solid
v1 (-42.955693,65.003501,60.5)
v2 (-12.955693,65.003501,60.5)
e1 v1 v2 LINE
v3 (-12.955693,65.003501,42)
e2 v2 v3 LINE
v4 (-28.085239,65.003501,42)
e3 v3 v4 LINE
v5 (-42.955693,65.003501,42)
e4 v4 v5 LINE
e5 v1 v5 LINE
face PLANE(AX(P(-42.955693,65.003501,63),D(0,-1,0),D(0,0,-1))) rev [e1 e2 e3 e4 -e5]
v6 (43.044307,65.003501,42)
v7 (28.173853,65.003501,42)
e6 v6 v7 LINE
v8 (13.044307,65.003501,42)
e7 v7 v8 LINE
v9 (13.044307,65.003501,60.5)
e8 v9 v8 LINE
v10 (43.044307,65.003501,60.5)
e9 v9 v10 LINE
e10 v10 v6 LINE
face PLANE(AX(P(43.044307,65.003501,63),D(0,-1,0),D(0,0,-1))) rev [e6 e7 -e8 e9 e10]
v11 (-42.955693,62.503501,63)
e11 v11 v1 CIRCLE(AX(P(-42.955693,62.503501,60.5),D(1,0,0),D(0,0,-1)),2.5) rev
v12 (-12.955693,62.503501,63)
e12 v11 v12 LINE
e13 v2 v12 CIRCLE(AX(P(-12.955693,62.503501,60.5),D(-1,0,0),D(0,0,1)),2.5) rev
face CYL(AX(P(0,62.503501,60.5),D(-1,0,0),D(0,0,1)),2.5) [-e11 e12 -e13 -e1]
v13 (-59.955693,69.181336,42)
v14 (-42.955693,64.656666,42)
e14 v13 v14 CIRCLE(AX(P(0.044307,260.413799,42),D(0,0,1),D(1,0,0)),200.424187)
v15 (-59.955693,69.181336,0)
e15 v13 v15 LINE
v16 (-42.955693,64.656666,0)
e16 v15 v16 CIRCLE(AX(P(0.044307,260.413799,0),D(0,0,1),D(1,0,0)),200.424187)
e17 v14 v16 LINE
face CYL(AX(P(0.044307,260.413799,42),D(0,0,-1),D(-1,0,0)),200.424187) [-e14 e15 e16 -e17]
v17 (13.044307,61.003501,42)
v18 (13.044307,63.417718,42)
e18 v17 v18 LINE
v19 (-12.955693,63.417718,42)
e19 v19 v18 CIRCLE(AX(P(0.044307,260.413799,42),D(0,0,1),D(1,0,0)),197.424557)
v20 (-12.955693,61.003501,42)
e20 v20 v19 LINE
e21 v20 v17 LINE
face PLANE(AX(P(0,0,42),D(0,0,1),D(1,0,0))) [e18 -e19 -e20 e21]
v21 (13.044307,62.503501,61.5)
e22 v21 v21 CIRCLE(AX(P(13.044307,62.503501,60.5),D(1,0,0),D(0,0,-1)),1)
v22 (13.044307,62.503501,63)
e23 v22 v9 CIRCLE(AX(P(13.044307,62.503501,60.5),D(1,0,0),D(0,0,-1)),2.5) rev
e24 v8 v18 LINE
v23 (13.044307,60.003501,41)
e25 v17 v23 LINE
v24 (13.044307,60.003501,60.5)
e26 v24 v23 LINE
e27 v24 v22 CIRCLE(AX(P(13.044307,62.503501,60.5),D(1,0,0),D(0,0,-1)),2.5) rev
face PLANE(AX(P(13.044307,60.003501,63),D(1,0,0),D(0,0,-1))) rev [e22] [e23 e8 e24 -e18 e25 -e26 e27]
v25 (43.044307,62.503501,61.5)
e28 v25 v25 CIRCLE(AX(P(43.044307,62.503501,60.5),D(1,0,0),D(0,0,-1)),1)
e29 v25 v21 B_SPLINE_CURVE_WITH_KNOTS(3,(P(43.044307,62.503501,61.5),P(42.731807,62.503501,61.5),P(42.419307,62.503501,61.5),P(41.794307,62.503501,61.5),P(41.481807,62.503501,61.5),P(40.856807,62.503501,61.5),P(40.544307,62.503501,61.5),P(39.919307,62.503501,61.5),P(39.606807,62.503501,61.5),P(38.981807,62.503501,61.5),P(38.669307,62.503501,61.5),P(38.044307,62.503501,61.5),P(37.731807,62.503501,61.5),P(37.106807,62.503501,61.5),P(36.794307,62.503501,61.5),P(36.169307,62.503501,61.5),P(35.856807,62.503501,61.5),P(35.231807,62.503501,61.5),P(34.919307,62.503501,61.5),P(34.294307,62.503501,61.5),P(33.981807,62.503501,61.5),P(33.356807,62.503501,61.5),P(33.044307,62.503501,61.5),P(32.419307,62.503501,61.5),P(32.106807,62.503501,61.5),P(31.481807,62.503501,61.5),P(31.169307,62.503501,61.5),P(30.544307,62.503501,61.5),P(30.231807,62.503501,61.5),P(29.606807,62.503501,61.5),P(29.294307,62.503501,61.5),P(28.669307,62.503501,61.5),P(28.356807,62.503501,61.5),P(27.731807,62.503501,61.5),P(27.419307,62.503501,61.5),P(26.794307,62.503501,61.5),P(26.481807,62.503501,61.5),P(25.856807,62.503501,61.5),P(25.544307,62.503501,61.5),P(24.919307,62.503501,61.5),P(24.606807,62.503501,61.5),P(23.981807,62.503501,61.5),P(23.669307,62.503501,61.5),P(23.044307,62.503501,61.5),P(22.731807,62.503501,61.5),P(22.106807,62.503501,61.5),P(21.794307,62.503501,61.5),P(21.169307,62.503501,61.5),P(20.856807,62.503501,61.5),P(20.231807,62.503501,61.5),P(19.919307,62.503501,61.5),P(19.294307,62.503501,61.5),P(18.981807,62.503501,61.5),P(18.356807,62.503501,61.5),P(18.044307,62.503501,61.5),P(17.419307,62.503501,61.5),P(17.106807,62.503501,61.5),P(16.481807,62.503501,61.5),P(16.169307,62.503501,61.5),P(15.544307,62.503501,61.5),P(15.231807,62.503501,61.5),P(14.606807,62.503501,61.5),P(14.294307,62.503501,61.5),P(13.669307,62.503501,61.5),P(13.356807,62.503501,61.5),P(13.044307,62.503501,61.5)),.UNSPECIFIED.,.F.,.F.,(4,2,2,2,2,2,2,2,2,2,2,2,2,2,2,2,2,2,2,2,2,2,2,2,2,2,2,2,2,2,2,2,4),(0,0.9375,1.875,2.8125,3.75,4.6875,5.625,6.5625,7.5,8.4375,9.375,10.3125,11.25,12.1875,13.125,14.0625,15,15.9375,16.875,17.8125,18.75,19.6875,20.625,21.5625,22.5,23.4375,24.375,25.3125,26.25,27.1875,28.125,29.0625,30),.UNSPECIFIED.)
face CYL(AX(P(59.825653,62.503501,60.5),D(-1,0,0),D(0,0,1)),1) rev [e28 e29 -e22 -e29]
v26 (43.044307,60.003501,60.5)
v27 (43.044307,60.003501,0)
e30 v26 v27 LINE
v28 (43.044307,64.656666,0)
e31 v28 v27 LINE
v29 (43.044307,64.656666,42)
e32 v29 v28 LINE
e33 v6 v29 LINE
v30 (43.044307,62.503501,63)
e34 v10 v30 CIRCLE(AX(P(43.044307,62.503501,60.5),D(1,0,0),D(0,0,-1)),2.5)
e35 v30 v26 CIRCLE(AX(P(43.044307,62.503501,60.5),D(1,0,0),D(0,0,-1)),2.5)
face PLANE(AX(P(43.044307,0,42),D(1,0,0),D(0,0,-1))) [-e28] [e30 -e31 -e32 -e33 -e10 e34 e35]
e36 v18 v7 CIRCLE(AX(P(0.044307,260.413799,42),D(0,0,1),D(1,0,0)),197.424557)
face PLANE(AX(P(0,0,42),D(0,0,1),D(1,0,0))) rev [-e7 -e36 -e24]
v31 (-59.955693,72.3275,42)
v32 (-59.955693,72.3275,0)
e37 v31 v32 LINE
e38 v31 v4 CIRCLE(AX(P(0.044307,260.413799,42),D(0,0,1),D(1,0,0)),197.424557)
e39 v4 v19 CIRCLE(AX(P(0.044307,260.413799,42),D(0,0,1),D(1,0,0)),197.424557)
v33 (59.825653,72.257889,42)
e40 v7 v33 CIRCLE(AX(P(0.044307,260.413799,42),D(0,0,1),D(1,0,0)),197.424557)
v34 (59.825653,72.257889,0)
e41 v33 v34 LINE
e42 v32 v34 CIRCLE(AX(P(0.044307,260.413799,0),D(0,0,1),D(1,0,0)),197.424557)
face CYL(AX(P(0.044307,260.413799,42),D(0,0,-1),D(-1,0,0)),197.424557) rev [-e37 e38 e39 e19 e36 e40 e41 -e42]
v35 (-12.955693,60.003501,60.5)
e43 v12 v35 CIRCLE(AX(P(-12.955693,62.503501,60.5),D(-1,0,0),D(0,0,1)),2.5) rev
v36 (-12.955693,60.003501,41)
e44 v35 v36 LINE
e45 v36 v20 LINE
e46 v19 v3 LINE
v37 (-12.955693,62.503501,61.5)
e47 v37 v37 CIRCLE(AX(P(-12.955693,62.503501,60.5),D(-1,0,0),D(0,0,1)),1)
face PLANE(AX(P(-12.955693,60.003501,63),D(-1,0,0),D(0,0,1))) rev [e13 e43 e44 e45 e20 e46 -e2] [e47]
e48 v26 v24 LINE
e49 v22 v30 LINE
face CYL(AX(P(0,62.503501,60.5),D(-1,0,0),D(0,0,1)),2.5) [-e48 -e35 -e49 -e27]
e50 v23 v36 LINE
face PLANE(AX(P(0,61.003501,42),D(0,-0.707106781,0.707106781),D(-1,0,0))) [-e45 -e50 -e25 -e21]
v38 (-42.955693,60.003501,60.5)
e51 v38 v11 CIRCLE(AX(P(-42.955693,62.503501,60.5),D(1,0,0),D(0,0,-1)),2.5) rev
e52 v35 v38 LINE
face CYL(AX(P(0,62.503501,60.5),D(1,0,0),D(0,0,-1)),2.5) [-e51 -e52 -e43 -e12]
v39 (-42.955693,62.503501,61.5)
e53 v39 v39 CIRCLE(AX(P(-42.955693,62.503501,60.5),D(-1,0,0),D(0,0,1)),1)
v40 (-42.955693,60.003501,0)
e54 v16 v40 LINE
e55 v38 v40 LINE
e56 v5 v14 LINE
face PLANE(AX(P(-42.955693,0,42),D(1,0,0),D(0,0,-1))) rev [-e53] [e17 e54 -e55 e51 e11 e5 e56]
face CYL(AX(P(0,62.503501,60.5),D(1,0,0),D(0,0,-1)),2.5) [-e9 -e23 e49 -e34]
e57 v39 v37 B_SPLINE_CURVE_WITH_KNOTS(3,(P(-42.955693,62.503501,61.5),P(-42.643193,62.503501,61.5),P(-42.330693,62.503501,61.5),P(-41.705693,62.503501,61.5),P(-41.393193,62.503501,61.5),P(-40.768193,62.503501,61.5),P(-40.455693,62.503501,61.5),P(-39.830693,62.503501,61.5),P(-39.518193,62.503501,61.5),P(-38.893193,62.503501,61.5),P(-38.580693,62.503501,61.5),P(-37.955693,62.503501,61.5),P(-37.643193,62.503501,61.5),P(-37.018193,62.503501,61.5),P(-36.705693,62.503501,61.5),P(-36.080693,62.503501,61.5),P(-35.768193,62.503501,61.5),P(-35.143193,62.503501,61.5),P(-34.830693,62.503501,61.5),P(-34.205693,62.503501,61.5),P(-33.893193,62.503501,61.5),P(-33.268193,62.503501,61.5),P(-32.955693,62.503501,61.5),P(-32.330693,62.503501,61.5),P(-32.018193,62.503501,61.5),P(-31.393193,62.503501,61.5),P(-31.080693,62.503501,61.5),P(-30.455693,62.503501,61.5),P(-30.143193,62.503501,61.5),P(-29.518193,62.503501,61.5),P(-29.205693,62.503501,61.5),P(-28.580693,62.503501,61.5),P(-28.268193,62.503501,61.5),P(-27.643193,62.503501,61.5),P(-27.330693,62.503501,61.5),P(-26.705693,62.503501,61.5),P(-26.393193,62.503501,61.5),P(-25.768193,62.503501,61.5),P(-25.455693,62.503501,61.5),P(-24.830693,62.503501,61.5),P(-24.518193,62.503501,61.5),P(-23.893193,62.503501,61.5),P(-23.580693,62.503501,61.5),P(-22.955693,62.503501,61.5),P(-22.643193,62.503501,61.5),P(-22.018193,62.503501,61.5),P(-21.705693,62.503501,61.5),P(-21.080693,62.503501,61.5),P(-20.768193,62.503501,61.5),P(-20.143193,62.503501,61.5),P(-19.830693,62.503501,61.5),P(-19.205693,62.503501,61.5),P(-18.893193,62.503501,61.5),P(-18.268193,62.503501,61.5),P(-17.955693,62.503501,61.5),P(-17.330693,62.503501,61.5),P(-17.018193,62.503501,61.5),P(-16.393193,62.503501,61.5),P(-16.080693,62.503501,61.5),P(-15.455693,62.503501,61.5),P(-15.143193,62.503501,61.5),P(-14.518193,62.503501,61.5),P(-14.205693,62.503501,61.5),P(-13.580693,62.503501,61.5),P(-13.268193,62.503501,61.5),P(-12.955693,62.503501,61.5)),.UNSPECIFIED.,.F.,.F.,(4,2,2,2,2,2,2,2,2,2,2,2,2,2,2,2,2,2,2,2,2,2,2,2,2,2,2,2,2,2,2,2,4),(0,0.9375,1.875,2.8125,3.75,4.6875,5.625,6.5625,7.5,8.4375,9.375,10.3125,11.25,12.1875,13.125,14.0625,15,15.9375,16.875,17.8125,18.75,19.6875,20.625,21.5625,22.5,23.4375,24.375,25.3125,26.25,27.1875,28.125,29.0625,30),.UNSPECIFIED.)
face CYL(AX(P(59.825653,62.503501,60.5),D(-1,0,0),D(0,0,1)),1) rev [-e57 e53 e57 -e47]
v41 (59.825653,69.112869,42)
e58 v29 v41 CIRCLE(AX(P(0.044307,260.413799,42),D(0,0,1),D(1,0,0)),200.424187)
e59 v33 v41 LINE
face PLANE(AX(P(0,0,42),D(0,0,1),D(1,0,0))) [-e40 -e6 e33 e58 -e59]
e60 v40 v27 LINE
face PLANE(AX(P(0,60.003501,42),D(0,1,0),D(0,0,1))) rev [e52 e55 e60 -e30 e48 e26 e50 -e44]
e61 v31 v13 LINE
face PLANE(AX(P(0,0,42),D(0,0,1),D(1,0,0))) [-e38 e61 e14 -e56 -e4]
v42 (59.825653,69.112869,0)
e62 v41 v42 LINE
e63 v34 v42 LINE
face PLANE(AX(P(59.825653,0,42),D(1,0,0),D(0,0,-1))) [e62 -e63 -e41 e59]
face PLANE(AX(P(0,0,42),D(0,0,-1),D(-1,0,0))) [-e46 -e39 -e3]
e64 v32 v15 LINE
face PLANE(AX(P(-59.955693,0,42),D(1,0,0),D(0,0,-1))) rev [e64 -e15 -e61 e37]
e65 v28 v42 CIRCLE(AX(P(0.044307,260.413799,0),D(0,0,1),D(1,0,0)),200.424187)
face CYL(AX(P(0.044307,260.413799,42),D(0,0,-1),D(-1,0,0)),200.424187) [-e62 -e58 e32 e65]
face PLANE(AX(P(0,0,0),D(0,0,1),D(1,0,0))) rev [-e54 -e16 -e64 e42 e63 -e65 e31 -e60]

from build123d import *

# Parameters (mm, degrees)
RESSALTO_EXTRUS_O1_DEPTH = 42
SKETCH5_W                = 30
SKETCH5_H                = 5
BOSS_EXTRUDE3_DEPTH      = 21
FILLET1_R                = 2.5
CHAMFER1_SIZE            = 1
ESBO_O2_R                = 1
CORTE_EXTRUS_O1_DEPTH    = 141.585462716


with BuildPart() as part:
    # Esboço1 → Ressalto-extrusão1 (new body)
    with BuildSketch(Plane.XY):
        with BuildLine():
            ThreePointArc((59.825652908, 72.25788881), (-0.070426749, 62.989274947), (-59.955692994, 72.327500038))
            Line((-59.955692994, 72.327500038), (-59.955692994, 69.181335803))
            ThreePointArc((-59.955692994, 69.181335803), (-51.505359903, 66.732393535), (-42.955692994, 64.656666352))
            Line((-42.955692994, 64.656666352), (-42.955692994, 60.00350113))
            Line((-42.955692994, 60.00350113), (43.044307006, 60.00350113))
            Line((43.044307006, 60.00350113), (43.044307006, 64.656666352))
            ThreePointArc((43.044307006, 64.656666352), (51.483258227, 66.702959658), (59.825652908, 69.112869408))
            Line((59.825652908, 69.112869408), (59.825652908, 72.25788881))
        make_face()
    extrude(amount=RESSALTO_EXTRUS_O1_DEPTH)

    # Sketch5 → Boss-Extrude3 (add)
    with BuildSketch(Plane.XY.offset(42)):
        with Locations((-27.955692994, 62.50350113)):
            Rectangle(SKETCH5_W, SKETCH5_H)
        with Locations((28.044307006, 62.50350113)):
            Rectangle(SKETCH5_W, SKETCH5_H)
    extrude(amount=BOSS_EXTRUDE3_DEPTH)

    # Fillet1
    fillet1_edges = [part.edges().sort_by_distance(p)[0] for p in [
        (-27.955692994, 65.00350113, 63),
        (-27.955692994, 60.00350113, 63),
        (28.044307006, 65.00350113, 63),
        (28.044307006, 60.00350113, 63),
    ]]
    fillet(fillet1_edges, radius=FILLET1_R - 0.0001)  # a hair under: the kernel refuses the full size

    # Chamfer1
    chamfer1_edges = [part.edges().sort_by_distance(p)[0] for p in [
        (0.044307006, 60.00350113, 42),
    ]]
    chamfer(chamfer1_edges, length=CHAMFER1_SIZE)

    # Esboço2 → Corte-extrusão1 (cut, through all)
    with BuildSketch(Plane.ZY.offset(42.955692994)):
        with Locations((60.5, 62.50350113)):
            Circle(ESBO_O2_R)
    extrude(amount=-CORTE_EXTRUS_O1_DEPTH, mode=Mode.SUBTRACT)


solid = part.part
